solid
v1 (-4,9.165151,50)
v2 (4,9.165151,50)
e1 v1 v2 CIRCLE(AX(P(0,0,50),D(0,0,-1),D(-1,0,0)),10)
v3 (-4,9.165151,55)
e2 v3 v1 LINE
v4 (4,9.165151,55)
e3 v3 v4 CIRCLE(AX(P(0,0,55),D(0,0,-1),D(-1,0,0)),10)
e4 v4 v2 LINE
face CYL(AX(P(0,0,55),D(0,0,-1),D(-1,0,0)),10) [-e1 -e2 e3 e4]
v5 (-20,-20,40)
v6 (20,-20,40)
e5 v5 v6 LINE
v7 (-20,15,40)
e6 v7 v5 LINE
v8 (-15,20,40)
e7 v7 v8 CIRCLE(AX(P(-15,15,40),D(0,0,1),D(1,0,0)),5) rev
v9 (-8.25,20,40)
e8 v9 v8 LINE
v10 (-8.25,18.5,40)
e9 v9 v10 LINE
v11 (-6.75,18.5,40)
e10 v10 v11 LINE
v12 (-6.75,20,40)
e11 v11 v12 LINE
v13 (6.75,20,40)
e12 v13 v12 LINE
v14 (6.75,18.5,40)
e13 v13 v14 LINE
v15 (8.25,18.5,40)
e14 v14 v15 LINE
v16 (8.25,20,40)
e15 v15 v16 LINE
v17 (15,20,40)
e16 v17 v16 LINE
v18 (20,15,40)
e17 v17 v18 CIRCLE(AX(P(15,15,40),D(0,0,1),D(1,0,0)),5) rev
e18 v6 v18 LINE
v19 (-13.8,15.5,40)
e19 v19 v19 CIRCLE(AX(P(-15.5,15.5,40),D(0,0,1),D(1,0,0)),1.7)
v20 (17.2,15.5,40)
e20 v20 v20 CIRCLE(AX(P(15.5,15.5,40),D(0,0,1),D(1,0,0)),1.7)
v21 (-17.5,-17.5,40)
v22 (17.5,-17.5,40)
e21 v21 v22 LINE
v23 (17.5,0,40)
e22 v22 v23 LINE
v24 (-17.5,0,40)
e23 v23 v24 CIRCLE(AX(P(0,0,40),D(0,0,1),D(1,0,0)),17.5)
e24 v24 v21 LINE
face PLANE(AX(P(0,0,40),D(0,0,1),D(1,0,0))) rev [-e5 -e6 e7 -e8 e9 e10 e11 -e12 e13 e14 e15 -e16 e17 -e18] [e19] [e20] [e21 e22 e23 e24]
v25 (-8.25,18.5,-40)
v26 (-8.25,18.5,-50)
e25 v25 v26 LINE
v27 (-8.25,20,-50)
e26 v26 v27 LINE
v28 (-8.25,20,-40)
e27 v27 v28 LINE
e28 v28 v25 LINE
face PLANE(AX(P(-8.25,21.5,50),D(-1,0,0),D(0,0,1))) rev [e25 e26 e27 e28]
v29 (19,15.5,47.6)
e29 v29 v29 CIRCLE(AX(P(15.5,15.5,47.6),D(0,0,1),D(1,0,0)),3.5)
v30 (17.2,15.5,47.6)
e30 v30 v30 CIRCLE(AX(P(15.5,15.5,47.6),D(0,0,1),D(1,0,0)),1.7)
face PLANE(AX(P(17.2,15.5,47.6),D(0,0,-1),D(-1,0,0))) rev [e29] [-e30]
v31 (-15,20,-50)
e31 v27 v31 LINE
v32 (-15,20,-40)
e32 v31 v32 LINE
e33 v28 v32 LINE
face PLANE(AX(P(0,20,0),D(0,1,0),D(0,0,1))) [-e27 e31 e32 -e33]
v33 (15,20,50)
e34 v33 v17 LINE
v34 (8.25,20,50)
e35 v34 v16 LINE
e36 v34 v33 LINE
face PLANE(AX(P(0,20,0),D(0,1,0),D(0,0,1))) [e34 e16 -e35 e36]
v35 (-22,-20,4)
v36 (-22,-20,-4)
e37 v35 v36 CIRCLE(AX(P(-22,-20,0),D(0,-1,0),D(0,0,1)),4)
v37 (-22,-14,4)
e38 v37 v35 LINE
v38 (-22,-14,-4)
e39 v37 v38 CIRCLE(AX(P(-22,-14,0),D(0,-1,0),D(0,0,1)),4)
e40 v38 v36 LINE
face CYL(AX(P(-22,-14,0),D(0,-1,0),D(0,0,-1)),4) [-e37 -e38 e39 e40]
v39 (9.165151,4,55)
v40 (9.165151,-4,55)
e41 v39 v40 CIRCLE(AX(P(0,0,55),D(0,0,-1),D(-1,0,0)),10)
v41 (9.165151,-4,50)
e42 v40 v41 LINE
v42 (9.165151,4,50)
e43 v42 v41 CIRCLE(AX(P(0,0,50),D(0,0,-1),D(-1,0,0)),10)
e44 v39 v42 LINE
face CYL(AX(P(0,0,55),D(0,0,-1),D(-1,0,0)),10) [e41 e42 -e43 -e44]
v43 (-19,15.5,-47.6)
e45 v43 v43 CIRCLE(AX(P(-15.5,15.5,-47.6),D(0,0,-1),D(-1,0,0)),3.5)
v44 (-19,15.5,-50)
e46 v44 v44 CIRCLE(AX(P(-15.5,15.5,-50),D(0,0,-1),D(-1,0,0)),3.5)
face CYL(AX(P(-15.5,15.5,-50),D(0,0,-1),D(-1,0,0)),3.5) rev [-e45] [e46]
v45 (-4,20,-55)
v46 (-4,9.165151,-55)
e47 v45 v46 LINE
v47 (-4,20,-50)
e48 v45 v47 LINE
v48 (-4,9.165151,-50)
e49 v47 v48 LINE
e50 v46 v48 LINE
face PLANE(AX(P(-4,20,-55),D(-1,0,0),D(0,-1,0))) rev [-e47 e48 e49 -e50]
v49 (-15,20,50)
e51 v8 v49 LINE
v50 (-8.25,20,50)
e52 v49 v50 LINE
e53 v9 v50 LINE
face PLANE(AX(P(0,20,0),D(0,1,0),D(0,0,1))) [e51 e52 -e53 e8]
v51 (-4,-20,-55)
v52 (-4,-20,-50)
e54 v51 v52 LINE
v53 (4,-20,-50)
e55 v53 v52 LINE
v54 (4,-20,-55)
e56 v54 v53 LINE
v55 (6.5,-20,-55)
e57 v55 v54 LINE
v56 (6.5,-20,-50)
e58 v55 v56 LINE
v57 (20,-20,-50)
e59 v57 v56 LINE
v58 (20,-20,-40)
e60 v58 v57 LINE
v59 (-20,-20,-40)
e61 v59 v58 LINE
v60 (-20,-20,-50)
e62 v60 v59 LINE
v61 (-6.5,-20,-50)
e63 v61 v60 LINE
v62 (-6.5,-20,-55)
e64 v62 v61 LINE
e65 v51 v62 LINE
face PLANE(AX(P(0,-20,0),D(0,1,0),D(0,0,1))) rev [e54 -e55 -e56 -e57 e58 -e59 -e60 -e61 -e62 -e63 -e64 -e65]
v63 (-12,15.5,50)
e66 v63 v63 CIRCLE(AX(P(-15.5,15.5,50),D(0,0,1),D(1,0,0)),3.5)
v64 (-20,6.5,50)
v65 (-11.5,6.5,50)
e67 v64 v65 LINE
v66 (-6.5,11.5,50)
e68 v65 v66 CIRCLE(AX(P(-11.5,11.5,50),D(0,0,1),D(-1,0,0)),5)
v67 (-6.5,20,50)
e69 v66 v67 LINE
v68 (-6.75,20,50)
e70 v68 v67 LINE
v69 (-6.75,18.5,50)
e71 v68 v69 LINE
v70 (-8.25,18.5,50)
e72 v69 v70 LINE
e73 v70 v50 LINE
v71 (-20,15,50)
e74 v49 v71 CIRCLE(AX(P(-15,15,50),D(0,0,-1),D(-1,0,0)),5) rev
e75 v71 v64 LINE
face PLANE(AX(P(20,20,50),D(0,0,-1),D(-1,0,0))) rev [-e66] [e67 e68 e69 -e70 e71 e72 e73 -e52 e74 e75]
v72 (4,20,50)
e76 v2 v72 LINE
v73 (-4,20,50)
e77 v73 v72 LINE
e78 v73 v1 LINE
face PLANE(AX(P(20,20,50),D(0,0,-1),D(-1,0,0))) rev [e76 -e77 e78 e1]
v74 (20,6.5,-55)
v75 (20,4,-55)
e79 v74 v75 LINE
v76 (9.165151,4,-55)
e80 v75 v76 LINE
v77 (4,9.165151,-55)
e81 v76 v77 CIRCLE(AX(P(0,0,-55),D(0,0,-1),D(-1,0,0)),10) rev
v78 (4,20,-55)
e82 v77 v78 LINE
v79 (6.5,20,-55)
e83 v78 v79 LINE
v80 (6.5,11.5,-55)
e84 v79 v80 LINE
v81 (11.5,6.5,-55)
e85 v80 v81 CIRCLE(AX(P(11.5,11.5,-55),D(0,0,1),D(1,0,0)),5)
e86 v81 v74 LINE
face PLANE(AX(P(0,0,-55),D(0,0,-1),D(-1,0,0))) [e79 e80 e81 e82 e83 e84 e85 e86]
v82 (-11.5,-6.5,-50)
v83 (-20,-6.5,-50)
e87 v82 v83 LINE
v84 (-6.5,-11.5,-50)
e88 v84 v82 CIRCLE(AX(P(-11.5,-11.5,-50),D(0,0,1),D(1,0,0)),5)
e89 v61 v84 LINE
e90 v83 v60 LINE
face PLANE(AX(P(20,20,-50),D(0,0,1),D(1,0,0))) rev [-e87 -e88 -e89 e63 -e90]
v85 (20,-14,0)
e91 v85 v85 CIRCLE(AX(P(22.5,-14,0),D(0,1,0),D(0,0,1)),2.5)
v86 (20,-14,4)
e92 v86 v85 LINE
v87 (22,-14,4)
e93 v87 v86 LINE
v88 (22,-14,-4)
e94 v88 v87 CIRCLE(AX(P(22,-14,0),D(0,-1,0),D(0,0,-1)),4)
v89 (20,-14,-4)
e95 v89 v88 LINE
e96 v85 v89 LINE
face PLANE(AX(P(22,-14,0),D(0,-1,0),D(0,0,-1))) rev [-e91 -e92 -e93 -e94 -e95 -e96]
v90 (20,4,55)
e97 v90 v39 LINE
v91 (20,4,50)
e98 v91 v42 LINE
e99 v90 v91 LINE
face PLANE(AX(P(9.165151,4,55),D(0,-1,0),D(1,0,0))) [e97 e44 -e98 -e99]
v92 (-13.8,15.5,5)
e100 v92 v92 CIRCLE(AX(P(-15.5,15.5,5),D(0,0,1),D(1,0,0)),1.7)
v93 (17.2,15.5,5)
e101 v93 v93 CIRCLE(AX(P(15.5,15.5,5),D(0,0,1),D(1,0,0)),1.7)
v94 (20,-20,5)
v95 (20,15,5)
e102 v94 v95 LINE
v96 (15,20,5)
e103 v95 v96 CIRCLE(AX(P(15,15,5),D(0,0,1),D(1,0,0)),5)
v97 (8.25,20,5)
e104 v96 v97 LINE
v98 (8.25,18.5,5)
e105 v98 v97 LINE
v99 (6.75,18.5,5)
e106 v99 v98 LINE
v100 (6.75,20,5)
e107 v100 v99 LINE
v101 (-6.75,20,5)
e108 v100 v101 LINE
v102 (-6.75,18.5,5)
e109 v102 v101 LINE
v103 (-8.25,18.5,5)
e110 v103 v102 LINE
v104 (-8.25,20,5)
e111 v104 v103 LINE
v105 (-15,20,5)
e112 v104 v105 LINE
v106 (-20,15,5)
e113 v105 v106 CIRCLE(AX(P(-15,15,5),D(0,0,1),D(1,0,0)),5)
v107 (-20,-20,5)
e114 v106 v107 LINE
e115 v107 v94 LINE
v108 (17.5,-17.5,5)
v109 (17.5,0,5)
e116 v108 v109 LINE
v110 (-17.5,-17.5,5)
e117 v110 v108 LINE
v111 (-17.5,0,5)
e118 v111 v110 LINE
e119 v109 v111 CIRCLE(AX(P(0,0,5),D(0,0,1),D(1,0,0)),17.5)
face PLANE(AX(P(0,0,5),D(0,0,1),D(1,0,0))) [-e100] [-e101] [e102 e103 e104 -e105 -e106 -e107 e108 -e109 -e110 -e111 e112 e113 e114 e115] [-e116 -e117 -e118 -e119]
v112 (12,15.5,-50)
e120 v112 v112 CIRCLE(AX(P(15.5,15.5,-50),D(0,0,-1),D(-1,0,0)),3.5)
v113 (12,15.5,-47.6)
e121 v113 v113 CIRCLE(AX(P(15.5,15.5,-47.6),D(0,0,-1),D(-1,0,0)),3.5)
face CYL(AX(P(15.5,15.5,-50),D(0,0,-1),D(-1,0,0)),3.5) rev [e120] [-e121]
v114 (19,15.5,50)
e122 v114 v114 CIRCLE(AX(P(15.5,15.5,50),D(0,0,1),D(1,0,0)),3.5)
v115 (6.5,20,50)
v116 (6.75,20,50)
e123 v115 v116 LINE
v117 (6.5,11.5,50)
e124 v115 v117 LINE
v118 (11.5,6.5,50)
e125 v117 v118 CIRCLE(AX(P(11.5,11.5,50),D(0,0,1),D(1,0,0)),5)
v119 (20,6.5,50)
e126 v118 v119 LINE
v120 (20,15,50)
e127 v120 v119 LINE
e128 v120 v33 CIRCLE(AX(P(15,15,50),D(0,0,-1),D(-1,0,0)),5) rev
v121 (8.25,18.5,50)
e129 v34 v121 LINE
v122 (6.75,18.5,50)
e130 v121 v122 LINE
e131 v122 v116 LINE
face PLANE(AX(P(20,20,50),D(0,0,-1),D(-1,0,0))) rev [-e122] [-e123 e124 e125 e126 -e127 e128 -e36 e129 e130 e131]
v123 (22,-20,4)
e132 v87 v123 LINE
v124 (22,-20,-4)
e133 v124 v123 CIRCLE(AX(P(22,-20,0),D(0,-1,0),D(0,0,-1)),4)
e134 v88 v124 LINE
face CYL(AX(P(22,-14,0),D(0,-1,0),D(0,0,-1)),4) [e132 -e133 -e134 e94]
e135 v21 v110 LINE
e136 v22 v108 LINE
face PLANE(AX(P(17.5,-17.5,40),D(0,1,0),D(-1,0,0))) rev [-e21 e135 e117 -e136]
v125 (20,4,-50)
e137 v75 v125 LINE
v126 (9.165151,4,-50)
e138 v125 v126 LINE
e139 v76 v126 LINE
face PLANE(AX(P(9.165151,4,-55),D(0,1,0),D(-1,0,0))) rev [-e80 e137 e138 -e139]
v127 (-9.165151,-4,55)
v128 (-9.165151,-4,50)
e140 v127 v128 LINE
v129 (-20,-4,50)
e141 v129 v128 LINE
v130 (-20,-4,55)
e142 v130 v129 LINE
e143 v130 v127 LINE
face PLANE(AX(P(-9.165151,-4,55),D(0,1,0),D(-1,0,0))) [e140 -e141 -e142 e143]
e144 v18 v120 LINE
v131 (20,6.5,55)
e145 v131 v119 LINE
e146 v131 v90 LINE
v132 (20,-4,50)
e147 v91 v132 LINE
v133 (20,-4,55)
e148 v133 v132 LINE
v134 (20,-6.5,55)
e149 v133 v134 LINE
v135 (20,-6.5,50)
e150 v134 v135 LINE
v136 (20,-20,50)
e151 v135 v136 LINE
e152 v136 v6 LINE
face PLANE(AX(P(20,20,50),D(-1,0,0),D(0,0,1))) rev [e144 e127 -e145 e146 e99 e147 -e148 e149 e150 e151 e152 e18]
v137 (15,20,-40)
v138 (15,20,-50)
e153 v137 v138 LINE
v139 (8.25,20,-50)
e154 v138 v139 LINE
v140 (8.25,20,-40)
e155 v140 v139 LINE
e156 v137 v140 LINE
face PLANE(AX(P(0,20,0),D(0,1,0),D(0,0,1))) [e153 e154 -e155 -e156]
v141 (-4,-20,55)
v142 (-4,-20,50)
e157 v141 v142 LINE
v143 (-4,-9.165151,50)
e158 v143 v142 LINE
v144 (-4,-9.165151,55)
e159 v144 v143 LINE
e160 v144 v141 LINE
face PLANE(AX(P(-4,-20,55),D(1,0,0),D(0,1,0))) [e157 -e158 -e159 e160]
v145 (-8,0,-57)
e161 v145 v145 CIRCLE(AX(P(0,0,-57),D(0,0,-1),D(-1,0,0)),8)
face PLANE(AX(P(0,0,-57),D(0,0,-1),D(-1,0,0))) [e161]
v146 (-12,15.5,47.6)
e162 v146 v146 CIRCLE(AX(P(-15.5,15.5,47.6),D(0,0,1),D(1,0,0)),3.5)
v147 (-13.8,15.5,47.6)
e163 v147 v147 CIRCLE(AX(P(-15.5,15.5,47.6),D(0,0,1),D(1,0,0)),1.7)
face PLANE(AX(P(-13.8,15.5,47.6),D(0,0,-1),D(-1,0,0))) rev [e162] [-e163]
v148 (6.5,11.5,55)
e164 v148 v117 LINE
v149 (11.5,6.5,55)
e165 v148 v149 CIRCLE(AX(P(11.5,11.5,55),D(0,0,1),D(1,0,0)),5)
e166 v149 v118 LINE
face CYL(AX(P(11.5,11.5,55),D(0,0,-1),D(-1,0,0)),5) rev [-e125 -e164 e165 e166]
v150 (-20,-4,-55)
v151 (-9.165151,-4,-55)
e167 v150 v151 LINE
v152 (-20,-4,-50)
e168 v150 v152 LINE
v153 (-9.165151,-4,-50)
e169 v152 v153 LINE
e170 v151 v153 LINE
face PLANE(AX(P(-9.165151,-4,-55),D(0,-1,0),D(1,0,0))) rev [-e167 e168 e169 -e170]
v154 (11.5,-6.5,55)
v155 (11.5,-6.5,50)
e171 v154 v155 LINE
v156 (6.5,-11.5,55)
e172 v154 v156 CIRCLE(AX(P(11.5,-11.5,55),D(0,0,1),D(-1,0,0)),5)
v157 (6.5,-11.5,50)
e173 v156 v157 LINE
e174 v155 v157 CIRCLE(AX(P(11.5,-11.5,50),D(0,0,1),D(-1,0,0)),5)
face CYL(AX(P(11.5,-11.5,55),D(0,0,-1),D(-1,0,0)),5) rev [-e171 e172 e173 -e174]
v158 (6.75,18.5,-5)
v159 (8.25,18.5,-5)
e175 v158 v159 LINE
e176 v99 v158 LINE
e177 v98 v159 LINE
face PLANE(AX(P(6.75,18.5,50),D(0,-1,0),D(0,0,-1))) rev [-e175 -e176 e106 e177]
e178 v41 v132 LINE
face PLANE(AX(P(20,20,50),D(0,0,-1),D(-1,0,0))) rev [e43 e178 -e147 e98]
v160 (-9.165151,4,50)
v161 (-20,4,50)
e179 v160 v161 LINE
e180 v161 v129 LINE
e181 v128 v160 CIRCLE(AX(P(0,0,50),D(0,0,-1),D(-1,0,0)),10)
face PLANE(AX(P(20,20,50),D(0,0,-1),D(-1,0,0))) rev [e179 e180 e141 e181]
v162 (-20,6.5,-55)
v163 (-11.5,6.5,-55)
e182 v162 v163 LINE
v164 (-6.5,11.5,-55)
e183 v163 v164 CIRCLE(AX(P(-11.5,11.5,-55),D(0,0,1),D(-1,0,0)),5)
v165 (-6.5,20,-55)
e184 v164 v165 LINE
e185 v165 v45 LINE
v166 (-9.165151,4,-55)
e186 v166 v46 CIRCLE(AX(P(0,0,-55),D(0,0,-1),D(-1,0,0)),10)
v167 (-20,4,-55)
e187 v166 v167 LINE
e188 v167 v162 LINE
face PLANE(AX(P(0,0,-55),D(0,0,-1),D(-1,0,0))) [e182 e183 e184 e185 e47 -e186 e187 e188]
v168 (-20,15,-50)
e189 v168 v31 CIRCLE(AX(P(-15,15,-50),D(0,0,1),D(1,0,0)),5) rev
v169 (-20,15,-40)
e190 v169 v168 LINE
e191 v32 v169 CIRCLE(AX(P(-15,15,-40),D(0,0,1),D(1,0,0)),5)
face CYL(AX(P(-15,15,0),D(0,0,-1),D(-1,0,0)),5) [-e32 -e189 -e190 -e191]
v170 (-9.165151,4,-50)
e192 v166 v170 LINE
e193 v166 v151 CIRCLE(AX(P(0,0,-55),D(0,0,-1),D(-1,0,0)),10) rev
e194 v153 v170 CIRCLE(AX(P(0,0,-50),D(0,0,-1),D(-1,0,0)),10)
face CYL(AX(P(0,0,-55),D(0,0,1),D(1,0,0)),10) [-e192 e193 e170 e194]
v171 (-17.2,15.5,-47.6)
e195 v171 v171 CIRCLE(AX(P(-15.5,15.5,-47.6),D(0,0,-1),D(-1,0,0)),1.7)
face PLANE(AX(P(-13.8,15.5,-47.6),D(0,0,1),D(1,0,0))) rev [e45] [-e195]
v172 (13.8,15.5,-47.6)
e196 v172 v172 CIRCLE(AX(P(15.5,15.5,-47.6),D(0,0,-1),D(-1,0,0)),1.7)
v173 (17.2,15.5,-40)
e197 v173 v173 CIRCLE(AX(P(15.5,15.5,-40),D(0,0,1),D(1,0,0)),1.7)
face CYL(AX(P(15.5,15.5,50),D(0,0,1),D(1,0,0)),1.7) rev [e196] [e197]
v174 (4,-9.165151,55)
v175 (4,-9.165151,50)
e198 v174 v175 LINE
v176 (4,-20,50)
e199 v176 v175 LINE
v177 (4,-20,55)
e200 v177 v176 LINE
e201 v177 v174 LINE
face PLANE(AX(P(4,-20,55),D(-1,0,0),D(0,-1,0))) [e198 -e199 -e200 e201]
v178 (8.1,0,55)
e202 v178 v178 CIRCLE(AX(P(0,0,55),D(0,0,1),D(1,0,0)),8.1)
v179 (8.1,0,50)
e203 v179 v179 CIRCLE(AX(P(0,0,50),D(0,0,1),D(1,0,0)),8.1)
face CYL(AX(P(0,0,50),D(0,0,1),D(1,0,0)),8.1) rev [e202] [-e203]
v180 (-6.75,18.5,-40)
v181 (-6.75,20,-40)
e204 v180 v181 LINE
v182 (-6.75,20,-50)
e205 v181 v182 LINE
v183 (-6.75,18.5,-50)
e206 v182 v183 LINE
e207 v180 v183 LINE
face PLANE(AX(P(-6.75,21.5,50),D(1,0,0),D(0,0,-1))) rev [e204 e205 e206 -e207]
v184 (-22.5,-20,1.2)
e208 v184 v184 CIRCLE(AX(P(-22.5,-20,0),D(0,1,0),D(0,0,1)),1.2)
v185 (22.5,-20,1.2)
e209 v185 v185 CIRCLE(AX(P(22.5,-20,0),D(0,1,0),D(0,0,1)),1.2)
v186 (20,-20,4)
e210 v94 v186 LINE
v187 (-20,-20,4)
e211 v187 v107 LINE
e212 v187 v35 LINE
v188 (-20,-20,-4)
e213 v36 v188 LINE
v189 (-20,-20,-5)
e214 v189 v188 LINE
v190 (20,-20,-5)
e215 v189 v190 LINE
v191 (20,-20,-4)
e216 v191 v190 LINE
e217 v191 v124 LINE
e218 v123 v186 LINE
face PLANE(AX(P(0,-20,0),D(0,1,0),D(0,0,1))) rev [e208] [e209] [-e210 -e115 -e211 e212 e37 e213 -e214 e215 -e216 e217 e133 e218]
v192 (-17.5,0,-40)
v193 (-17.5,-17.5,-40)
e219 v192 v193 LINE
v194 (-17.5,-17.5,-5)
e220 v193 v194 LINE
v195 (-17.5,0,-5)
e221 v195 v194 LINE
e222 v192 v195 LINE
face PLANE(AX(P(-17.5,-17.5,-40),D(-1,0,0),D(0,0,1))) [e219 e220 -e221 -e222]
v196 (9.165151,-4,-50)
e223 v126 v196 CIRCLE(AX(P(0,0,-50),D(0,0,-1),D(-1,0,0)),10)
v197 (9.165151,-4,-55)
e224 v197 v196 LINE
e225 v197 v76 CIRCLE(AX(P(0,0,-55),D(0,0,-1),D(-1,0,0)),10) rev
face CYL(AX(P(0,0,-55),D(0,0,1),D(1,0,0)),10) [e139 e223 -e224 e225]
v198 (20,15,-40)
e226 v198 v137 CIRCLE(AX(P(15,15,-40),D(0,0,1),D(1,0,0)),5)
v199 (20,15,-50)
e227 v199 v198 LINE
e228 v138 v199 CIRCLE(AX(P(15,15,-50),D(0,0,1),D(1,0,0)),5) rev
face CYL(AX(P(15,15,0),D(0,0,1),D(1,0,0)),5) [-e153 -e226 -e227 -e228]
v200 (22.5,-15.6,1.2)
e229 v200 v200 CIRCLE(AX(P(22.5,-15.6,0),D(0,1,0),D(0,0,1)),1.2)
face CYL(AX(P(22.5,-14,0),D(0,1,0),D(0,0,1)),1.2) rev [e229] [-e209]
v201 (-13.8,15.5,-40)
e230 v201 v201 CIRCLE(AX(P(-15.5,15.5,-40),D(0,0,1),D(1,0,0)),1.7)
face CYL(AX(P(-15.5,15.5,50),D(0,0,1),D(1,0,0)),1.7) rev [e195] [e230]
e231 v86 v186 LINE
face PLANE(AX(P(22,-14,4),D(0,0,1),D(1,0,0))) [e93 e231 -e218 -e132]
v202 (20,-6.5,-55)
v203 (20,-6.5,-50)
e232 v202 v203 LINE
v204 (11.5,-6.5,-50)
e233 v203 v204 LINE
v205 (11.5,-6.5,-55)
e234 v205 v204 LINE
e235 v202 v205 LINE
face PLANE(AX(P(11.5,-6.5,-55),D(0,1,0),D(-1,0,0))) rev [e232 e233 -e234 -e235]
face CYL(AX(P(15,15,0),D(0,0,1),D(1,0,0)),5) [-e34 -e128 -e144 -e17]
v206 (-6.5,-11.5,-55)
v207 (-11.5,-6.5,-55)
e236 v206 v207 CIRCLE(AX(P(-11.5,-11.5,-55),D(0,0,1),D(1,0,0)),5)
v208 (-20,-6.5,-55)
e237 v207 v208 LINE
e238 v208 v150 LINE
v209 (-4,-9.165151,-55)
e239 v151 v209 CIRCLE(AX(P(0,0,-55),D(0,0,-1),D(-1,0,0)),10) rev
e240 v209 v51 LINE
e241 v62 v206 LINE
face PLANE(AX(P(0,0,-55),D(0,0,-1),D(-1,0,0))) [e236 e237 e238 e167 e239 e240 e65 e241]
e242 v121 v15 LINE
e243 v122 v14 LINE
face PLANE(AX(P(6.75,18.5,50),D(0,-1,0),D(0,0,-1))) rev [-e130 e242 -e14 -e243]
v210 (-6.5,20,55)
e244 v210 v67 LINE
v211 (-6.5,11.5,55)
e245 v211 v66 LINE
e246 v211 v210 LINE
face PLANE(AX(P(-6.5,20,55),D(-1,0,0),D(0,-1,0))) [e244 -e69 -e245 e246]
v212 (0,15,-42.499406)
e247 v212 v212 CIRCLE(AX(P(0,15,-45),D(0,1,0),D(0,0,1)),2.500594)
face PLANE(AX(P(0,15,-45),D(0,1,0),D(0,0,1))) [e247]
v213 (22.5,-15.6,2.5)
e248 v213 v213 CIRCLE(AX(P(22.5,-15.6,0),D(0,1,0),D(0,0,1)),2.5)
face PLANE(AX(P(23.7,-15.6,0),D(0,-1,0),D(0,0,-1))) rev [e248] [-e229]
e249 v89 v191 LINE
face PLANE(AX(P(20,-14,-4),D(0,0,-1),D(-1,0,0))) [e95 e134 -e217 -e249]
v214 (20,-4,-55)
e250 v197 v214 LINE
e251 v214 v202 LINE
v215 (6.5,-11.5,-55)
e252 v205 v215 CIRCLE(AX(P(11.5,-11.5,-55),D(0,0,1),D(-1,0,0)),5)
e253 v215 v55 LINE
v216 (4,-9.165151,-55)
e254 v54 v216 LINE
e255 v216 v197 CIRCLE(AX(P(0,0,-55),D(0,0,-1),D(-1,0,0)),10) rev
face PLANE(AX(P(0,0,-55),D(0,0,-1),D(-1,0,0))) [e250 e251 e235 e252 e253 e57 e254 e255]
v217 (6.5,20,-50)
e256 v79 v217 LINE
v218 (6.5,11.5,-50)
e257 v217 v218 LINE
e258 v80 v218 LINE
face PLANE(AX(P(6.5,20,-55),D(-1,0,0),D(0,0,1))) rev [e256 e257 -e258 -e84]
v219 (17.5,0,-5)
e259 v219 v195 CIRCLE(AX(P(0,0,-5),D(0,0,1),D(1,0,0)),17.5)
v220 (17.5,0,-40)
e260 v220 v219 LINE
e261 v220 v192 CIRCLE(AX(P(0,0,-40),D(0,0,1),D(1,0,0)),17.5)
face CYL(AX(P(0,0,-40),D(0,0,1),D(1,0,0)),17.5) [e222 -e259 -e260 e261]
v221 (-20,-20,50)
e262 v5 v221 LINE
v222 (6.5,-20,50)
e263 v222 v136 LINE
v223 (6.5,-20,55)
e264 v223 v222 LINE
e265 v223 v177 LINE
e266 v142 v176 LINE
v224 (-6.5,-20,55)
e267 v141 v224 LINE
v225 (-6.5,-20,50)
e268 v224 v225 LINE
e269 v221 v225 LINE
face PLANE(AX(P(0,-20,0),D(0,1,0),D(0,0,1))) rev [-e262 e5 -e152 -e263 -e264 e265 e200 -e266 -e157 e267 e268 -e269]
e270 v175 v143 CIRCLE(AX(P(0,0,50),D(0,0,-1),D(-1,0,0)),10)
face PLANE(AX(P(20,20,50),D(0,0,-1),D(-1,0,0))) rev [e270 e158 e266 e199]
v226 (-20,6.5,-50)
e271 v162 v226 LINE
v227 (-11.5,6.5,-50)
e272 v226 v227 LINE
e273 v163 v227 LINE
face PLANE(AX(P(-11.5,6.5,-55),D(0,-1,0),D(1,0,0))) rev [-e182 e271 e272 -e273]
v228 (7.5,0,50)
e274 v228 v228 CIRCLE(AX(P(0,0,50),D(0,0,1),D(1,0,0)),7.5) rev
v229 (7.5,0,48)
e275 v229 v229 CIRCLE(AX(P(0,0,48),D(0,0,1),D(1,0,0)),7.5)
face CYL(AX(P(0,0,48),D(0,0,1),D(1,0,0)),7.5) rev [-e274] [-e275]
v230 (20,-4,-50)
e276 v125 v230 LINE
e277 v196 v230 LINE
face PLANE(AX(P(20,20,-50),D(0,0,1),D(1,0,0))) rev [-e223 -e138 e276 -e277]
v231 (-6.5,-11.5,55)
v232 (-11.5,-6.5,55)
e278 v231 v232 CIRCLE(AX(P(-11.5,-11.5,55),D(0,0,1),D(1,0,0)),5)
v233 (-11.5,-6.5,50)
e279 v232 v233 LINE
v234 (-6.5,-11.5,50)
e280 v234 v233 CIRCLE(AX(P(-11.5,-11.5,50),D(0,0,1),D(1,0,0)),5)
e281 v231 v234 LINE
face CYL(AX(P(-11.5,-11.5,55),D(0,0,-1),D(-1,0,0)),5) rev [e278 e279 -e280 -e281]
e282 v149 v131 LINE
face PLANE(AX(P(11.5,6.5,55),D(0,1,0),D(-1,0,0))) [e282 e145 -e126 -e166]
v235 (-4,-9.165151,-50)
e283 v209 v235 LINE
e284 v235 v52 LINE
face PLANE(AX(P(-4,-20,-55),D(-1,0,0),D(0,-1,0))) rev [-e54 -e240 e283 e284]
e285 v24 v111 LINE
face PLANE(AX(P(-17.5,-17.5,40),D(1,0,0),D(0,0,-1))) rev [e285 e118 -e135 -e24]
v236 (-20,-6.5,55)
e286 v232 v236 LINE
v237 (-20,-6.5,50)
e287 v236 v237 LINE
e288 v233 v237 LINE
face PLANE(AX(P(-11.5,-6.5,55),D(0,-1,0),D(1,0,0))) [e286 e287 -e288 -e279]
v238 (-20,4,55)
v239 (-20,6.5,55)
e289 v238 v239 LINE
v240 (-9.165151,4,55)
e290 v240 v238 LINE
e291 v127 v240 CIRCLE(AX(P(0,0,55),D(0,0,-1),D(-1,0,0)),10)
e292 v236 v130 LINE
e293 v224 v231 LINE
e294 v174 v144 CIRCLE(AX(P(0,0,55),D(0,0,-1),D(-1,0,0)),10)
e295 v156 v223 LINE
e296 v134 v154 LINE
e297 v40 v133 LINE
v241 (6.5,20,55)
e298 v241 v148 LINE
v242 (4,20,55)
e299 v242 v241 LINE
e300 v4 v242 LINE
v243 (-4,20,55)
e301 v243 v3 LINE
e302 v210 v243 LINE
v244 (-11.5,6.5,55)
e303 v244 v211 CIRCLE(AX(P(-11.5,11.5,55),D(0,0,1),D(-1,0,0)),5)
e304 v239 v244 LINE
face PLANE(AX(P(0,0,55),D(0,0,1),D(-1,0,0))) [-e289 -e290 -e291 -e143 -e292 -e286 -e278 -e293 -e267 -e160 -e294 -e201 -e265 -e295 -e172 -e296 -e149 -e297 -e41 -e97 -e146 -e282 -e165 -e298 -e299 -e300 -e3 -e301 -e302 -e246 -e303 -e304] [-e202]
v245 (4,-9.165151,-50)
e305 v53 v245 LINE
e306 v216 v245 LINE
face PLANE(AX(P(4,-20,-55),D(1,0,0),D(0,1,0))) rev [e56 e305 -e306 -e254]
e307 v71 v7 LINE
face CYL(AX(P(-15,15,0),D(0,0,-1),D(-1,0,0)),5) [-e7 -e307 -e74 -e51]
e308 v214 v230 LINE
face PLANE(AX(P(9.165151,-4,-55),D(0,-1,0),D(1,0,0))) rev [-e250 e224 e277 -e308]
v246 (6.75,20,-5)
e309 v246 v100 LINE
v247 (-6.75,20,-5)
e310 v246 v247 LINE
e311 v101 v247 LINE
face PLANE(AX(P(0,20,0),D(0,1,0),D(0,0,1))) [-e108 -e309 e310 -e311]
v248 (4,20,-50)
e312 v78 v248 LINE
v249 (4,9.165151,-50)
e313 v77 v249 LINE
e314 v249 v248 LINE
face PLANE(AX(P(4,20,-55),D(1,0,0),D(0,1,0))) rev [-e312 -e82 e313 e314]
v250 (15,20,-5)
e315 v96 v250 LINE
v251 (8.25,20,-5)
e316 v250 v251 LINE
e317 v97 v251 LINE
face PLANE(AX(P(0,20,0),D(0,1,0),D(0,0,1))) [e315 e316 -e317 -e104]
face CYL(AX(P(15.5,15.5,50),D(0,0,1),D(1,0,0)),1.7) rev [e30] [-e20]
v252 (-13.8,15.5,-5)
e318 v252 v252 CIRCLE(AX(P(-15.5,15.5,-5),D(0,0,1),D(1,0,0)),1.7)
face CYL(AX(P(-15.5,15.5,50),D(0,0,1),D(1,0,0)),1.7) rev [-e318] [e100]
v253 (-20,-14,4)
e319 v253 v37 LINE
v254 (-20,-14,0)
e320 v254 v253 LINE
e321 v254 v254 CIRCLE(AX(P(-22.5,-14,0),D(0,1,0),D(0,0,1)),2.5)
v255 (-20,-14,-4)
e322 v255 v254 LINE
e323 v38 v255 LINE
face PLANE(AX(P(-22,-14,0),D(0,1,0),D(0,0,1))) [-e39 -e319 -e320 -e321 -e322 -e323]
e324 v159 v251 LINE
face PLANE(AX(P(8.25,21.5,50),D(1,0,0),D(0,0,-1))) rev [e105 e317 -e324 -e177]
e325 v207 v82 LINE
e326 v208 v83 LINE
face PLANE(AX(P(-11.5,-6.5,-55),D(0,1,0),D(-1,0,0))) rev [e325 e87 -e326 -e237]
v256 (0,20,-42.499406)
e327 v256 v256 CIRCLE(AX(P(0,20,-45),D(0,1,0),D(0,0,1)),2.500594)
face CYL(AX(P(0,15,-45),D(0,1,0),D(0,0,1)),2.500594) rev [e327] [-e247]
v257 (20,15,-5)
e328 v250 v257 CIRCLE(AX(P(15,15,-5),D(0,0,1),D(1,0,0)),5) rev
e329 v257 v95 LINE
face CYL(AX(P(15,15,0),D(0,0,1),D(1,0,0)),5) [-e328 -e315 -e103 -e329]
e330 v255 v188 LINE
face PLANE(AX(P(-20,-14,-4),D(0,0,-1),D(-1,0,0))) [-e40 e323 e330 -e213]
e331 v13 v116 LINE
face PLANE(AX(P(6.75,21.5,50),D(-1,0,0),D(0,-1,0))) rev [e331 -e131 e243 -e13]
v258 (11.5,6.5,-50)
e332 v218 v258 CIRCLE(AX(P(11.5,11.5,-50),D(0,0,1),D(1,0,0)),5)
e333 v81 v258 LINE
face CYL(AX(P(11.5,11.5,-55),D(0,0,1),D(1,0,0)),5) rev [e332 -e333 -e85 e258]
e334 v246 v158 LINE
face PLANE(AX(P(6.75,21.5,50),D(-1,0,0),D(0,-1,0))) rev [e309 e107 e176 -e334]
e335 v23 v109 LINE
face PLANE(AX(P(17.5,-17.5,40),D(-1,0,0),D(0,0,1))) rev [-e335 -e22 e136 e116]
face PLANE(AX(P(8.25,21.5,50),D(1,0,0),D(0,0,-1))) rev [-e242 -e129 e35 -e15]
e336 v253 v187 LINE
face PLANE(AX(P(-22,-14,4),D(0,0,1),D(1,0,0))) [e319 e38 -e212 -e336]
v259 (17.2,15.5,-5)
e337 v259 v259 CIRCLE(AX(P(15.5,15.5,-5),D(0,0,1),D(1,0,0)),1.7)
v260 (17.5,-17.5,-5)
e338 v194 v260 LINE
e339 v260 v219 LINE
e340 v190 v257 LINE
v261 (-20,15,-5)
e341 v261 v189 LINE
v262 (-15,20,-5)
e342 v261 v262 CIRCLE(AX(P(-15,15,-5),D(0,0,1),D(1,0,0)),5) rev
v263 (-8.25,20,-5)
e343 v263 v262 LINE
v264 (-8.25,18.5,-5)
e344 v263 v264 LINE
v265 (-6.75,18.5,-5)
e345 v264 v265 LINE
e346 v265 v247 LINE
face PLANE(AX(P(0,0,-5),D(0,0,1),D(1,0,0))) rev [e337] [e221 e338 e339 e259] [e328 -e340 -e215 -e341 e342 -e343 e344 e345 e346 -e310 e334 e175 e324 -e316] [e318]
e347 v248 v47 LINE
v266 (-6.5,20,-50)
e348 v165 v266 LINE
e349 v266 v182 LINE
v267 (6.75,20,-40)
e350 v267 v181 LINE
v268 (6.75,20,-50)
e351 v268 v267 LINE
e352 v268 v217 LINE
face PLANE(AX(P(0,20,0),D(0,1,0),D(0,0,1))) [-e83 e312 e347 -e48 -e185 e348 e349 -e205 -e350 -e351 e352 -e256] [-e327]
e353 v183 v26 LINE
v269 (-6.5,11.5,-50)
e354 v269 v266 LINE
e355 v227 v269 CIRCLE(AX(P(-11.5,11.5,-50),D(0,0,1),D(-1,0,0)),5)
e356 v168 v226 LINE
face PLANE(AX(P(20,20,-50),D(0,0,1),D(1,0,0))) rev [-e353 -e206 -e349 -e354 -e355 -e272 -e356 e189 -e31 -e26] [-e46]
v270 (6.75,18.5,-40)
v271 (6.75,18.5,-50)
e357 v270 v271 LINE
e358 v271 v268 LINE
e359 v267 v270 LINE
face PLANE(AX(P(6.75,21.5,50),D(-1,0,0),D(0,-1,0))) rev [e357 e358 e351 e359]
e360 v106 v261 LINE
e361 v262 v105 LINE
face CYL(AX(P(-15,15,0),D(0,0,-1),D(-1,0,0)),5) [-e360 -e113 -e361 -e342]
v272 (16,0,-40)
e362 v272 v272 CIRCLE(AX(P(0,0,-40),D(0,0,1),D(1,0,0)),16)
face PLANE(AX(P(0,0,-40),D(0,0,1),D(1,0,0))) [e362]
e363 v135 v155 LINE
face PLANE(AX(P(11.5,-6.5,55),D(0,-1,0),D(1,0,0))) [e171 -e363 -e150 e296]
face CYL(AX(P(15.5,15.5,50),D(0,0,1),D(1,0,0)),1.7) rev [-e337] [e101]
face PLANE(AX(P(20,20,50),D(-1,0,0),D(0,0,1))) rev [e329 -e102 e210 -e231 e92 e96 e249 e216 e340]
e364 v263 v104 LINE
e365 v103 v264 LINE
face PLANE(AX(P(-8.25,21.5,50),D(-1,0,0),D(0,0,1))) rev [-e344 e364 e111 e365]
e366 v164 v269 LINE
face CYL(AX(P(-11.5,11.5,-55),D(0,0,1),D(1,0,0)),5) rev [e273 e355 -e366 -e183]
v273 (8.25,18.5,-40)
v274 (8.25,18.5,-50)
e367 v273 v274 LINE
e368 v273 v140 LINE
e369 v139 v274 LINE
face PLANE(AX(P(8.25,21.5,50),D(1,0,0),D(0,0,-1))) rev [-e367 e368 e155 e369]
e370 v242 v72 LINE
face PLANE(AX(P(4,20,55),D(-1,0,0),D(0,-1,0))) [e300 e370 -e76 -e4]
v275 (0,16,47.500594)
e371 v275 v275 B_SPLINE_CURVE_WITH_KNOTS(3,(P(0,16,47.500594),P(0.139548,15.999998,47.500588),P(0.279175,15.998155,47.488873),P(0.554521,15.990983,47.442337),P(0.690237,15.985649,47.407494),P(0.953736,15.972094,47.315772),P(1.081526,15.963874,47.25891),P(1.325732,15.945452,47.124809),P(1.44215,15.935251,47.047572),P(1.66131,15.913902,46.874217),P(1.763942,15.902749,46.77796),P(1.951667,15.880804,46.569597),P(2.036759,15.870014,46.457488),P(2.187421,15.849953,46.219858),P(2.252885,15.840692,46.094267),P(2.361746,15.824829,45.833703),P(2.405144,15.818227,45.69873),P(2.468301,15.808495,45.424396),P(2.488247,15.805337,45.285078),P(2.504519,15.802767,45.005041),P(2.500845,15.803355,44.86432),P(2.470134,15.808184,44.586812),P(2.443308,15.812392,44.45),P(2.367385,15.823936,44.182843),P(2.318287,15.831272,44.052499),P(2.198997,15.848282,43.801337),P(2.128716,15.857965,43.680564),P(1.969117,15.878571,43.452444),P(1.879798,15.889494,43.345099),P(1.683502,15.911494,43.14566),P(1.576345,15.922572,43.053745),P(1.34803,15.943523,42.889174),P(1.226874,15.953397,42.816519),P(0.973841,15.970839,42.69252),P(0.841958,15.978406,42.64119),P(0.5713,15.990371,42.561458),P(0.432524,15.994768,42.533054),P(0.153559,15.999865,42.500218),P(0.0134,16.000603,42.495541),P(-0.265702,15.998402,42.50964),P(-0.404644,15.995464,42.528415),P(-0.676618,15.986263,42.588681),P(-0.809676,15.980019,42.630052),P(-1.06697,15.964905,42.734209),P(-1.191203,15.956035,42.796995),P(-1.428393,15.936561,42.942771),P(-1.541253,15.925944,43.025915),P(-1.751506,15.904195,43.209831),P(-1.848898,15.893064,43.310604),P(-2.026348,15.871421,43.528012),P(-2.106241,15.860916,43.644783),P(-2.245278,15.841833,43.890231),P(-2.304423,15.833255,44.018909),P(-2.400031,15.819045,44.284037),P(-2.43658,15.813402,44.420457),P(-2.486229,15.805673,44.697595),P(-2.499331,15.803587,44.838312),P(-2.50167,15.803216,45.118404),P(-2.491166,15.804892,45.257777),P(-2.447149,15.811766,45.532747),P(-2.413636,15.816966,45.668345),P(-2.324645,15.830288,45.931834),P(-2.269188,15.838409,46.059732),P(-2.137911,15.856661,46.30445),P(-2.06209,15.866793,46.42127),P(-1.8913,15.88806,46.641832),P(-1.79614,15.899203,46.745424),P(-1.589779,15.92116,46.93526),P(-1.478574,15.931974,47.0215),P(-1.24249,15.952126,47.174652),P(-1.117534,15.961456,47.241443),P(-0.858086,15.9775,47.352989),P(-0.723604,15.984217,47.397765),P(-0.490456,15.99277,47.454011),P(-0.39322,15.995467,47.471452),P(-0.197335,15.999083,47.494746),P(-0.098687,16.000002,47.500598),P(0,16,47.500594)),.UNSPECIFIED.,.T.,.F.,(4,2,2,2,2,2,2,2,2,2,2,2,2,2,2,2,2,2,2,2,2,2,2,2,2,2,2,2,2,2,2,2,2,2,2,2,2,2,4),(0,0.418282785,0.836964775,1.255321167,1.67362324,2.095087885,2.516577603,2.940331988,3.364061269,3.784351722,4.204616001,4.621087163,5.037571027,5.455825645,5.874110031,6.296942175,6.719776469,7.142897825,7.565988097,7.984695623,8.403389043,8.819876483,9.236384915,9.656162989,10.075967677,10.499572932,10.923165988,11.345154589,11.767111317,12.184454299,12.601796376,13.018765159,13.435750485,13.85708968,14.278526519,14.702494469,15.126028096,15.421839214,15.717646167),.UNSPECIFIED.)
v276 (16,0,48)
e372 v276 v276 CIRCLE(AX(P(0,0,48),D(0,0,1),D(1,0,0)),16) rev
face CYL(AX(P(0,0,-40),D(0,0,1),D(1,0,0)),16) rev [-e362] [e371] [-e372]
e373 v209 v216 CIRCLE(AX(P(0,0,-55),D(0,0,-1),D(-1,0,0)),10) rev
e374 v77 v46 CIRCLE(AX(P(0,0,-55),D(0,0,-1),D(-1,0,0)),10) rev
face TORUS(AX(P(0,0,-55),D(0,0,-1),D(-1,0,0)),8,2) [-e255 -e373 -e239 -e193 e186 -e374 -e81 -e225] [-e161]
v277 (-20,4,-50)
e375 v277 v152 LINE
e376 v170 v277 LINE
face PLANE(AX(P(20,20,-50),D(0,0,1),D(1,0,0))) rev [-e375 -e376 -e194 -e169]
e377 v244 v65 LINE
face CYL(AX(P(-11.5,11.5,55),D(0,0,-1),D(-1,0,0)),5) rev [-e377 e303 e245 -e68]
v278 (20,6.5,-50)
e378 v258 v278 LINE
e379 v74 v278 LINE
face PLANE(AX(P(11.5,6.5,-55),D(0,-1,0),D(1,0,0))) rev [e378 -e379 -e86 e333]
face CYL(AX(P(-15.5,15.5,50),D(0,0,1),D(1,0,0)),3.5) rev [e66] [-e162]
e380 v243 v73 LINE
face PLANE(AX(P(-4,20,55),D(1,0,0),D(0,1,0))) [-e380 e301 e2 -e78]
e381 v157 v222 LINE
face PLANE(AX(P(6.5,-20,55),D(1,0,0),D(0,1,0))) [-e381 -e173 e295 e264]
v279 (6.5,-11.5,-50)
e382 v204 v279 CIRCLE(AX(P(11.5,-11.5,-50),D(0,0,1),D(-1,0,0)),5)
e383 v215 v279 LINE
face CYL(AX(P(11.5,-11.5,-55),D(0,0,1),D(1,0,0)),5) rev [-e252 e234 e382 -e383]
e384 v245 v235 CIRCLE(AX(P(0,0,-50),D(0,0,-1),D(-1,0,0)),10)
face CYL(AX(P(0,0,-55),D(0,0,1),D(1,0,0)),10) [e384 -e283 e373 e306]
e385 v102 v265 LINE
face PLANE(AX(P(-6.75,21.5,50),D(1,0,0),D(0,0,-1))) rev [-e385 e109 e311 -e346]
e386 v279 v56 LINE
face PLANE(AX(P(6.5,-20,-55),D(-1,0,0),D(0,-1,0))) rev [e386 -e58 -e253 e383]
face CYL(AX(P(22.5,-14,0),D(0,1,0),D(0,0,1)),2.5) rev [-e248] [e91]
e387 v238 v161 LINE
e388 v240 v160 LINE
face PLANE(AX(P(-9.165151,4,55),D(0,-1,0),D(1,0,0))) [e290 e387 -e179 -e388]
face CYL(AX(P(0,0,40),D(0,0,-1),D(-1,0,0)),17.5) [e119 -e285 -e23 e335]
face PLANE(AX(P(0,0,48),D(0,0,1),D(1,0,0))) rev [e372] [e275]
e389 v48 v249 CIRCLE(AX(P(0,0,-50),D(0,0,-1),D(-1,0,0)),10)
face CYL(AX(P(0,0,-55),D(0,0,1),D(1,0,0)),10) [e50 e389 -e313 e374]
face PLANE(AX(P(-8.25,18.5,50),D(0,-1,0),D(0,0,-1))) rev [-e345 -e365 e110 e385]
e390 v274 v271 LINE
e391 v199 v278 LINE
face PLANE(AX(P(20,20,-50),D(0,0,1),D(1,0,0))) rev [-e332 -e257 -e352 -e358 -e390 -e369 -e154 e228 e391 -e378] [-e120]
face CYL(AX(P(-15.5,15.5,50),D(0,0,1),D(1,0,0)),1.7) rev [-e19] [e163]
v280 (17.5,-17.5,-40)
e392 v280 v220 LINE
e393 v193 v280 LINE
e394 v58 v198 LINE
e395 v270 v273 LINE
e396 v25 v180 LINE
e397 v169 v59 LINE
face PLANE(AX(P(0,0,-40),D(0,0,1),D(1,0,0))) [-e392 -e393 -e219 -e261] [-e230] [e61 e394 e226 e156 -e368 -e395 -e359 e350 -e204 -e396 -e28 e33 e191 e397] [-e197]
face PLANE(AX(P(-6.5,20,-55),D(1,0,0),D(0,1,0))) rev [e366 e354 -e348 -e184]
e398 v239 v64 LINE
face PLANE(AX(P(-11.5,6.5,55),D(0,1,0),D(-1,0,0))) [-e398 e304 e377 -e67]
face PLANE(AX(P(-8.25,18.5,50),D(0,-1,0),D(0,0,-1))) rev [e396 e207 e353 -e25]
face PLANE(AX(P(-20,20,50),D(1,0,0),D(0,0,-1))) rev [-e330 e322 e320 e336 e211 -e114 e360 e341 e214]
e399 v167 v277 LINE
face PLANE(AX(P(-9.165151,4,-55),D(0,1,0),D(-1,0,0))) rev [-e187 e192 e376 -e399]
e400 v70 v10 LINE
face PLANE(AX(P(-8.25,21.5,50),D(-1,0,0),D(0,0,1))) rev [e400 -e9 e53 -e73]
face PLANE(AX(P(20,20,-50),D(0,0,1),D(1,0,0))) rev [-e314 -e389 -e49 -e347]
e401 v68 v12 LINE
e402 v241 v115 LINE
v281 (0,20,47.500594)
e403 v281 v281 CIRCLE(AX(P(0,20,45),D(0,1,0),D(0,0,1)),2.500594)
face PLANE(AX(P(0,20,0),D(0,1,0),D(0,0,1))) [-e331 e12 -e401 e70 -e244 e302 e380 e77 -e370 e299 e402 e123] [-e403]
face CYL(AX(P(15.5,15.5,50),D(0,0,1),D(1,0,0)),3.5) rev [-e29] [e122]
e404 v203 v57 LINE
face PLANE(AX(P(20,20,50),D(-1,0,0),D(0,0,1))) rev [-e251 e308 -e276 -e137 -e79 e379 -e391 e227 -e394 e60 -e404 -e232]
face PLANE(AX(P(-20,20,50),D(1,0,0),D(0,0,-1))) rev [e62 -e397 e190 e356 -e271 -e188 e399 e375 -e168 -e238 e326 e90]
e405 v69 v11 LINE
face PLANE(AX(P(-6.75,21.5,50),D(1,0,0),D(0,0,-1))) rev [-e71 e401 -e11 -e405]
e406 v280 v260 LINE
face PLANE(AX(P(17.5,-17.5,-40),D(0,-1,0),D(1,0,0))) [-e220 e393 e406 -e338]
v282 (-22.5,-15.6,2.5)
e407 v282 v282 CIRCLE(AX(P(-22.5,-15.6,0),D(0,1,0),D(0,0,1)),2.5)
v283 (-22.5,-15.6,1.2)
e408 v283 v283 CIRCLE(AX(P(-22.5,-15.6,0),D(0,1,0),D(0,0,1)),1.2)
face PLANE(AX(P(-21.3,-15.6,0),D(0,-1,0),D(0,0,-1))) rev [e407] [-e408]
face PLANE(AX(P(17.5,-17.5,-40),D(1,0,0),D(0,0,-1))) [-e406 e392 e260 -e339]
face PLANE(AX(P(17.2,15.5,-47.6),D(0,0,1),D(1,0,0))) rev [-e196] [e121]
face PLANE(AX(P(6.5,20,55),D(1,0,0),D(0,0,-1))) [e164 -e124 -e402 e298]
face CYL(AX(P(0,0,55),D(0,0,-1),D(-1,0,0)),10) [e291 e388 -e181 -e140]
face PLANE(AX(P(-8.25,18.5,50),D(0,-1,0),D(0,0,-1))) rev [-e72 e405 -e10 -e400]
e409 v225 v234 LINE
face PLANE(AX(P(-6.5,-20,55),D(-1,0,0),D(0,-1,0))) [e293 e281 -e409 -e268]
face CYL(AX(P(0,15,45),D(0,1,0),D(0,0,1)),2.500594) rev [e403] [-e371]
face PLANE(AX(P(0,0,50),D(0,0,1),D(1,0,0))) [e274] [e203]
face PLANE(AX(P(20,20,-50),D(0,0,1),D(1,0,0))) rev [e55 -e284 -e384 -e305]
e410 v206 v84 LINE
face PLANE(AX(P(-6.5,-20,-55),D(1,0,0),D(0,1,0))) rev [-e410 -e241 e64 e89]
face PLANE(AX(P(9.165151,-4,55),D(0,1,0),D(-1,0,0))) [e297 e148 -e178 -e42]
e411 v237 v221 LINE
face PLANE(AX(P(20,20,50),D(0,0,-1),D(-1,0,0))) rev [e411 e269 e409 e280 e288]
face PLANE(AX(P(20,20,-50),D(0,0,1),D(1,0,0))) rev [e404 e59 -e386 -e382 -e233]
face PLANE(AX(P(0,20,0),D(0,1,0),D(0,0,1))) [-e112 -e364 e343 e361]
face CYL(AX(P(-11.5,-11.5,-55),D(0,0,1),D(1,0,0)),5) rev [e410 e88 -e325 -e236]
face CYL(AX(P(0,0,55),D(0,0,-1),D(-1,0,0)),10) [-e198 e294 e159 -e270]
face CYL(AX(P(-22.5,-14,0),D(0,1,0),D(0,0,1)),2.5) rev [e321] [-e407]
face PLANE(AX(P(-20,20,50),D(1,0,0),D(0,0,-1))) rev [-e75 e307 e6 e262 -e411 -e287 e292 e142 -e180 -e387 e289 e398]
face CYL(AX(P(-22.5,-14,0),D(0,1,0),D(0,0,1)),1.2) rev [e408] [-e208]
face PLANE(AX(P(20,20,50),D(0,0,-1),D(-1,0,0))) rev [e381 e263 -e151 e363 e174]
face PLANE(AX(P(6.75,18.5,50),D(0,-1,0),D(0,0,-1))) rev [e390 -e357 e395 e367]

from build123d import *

# Parameters (mm, degrees)
ESBO_O1_W                                            = 40
ESBO_O1_H                                            = 100
RESSALTO_EXTRUS_O1_DEPTH                             = 20
CORTE_EXTRUS_O1_DEPTH                                = 58.445626465
CORTE_EXTRUS_O1_DEPTH_BACK                           = 40
ESBO_O2_R                                            = 16
CORTE_EXTRUS_O5_START                                = -5
ESBO_O9_W                                            = 40
ESBO_O9_H                                            = 40
CORTE_EXTRUS_O5_DEPTH                                = 35
CORTE_EXTRUS_O7_START                                = 40
ESBO_O9_4_W                                          = 40
ESBO_O9_4_H                                          = 40
CORTE_EXTRUS_O7_DEPTH                                = 35
RESSALTO_EXTRUS_O2_DEPTH                             = 6
REBAIXO_PARA_PARAFUSO_DE_M_QUINA_COM_CAB_D           = 2.4
REBAIXO_PARA_PARAFUSO_DE_M_QUINA_COM_CAB_CBORE_D     = 5
REBAIXO_PARA_PARAFUSO_DE_M_QUINA_COM_CAB_CBORE_DEPTH = 1.6
REBAIXO_PARA_PARAFUSO_DE_M_QUINA_COM_2_D             = 3.4
REBAIXO_PARA_PARAFUSO_DE_M_QUINA_COM_2_CBORE_D       = 7
REBAIXO_PARA_PARAFUSO_DE_M_QUINA_COM_2_CBORE_DEPTH   = 2.4
FILETE4_R                                            = 5
REBAIXO_PARA_PARAFUSO_DE_M_QUINA_COM_3_D             = 3.4
REBAIXO_PARA_PARAFUSO_DE_M_QUINA_COM_3_DEPTH         = 10.05
REBAIXO_PARA_PARAFUSO_DE_M_QUINA_COM_3_CBORE_D       = 7
REBAIXO_PARA_PARAFUSO_DE_M_QUINA_COM_3_CBORE_DEPTH   = 2.4
REBAIXO_PARA_PARAFUSO_DE_M_QUINA_COM_3_TIP           = 1.021463052
ESBO_O20_W                                           = 1.5
ESBO_O20_H                                           = 3
CORTE_EXTRUS_O8_DEPTH                                = 106.242576935
ESBO_O21_R                                           = 2.50059394
CORTE_EXTRUS_O9_DEPTH                                = 5
RESSALTO_EXTRUS_O3_DEPTH                             = 5
ESBO_O23_R                                           = 10
RESSALTO_EXTRUS_O4_DEPTH                             = 2
FILETE5_R                                            = 2
RESSALTO_EXTRUS_O5_START                             = -2
ESBO_O24_R                                           = 16
ESBO_O24_R_2                                         = 7.5
RESSALTO_EXTRUS_O5_DEPTH                             = 2
ESBO_O26_R                                           = 8.1
CORTE_EXTRUS_O10_DEPTH                               = 5


with BuildPart() as part:
    # Esboço1 → Ressalto-extrusão1 (new, symmetric)
    with BuildSketch(Plane(origin=(0, 0, 0), x_dir=(1, 0, 0), z_dir=(0, 1, 0))):
        Rectangle(ESBO_O1_W, ESBO_O1_H)
    extrude(amount=RESSALTO_EXTRUS_O1_DEPTH, both=True)

    # Esboço2 → Corte-extrusão1 (cut, two sides: drawn at the far end of the back side and taken through both)
    with BuildSketch(Plane.XY.offset(-CORTE_EXTRUS_O1_DEPTH_BACK)):
        Circle(ESBO_O2_R)
    extrude(amount=CORTE_EXTRUS_O1_DEPTH + CORTE_EXTRUS_O1_DEPTH_BACK, mode=Mode.SUBTRACT)

    # Esboço9 → Corte-extrusão5 (cut)
    with BuildSketch(Plane.XY.offset(CORTE_EXTRUS_O5_START)):
        Rectangle(ESBO_O9_W, ESBO_O9_H)
        with BuildLine():
            Line((17.5, -17.5), (-17.5, -17.5))
            Line((-17.5, -17.5), (-17.5, 0))
            ThreePointArc((-17.5, 0), (0, 17.5), (17.5, 0))
            Line((17.5, 0), (17.5, -17.5))
        make_face(mode=Mode.SUBTRACT)
    extrude(amount=-CORTE_EXTRUS_O5_DEPTH, mode=Mode.SUBTRACT)

    # Esboço9<4> → Corte-extrusão7 (cut)
    with BuildSketch(Plane.XY.offset(CORTE_EXTRUS_O7_START)):
        Rectangle(ESBO_O9_4_W, ESBO_O9_4_H)
        with BuildLine():
            Line((17.5, -17.5), (-17.5, -17.5))
            Line((-17.5, -17.5), (-17.5, 0))
            ThreePointArc((-17.5, 0), (0, 17.5), (17.5, 0))
            Line((17.5, 0), (17.5, -17.5))
        make_face(mode=Mode.SUBTRACT)
    extrude(amount=-CORTE_EXTRUS_O7_DEPTH, mode=Mode.SUBTRACT)

    # Esboço3 → Ressalto-extrusão2 (add)
    with BuildSketch(Plane.XZ.offset(20)):
        with BuildLine():
            Line((20, 4), (20, -4))
            Line((20, -4), (22, -4))
            ThreePointArc((22, -4), (26, 0), (22, 4))
            Line((22, 4), (20, 4))
        make_face()
        with BuildLine():
            Line((-20, -4), (-22, -4))
            ThreePointArc((-22, -4), (-26, 0), (-22, 4))
            Line((-22, 4), (-20, 4))
            Line((-20, 4), (-20, -4))
        make_face()
    extrude(amount=-RESSALTO_EXTRUS_O2_DEPTH)

    # Rebaixo para parafuso de m_quina com cab (through all)
    with Locations(Plane(origin=(0, -14, 0), x_dir=(1, 0, 0), z_dir=(0, 1, 0))):
        with Locations((22.5, 0), (-22.5, 0)):
            CounterBoreHole(REBAIXO_PARA_PARAFUSO_DE_M_QUINA_COM_CAB_D / 2, REBAIXO_PARA_PARAFUSO_DE_M_QUINA_COM_CAB_CBORE_D / 2, REBAIXO_PARA_PARAFUSO_DE_M_QUINA_COM_CAB_CBORE_DEPTH)

    # Rebaixo para parafuso de m_quina com 2 (through all)
    with Locations(Plane.XY.offset(50)):
        with Locations((-15.5, 15.5), (15.5, 15.5)):
            CounterBoreHole(REBAIXO_PARA_PARAFUSO_DE_M_QUINA_COM_2_D / 2, REBAIXO_PARA_PARAFUSO_DE_M_QUINA_COM_2_CBORE_D / 2, REBAIXO_PARA_PARAFUSO_DE_M_QUINA_COM_2_CBORE_DEPTH)

    # Filete4
    filete4_edges = [part.edges().sort_by_distance(p)[0] for p in [
        (20, 20, 45),
        (-20, 20, 0),
        (20, 20, -45),
        (-20, 20, 45),
        (20, 20, 0),
        (-20, 20, -45),
    ]]
    fillet(filete4_edges, radius=FILETE4_R)

    # Rebaixo para parafuso de m_quina com 3
    with Locations(Plane(origin=(0, 0, -50), x_dir=(-1, 0, 0), z_dir=(0, 0, -1))):
        with Locations((-15.5, 15.5), (15.5, 15.5)):
            CounterBoreHole(REBAIXO_PARA_PARAFUSO_DE_M_QUINA_COM_3_D / 2, REBAIXO_PARA_PARAFUSO_DE_M_QUINA_COM_3_CBORE_D / 2, REBAIXO_PARA_PARAFUSO_DE_M_QUINA_COM_3_CBORE_DEPTH, depth=REBAIXO_PARA_PARAFUSO_DE_M_QUINA_COM_3_DEPTH)
            with Locations((0, 0, -(REBAIXO_PARA_PARAFUSO_DE_M_QUINA_COM_3_DEPTH + REBAIXO_PARA_PARAFUSO_DE_M_QUINA_COM_3_TIP / 2))):  # 118° drill point
                Cone(0, REBAIXO_PARA_PARAFUSO_DE_M_QUINA_COM_3_D / 2, REBAIXO_PARA_PARAFUSO_DE_M_QUINA_COM_3_TIP, mode=Mode.SUBTRACT)

    # Esboço20 → Corte-extrusão8 (cut, through all)
    with BuildSketch(Plane(origin=(0, 0, -50), x_dir=(-1, 0, 0), z_dir=(0, 0, -1))):
        with Locations((7.5, 20)):
            Rectangle(ESBO_O20_W, ESBO_O20_H)
        with Locations((-7.5, 20)):
            Rectangle(ESBO_O20_W, ESBO_O20_H)
    extrude(amount=-CORTE_EXTRUS_O8_DEPTH, mode=Mode.SUBTRACT)

    # Esboço21 → Corte-extrusão9 (cut)
    with BuildSketch(Plane(origin=(0, 20, 0), x_dir=(1, 0, 0), z_dir=(0, 1, 0))):
        with Locations(Location((0, -45, 0), (0, 0, 270))):
            Circle(ESBO_O21_R)
        with Locations(Location((0, 45, 0), (0, 0, 270))):
            Circle(ESBO_O21_R)
    extrude(amount=-CORTE_EXTRUS_O9_DEPTH, mode=Mode.SUBTRACT)

    # Esboço22 → Ressalto-extrusão3 (add)
    with BuildSketch(Plane(origin=(0, 0, -50), x_dir=(-1, 0, 0), z_dir=(0, 0, -1))):
        with BuildLine():
            Line((-6.5, 20), (-6.5, 11.5))
            ThreePointArc((-6.5, 11.5), (-7.964466094, 7.964466094), (-11.5, 6.5))
            Line((-11.5, 6.5), (-20, 6.5))
            Line((-20, 6.5), (-20, 4))
            Line((-20, 4), (-9.16515139, 4))
            ThreePointArc((-9.16515139, 4), (-10, 0), (-9.16515139, -4))
            Line((-9.16515139, -4), (-20, -4))
            Line((-20, -4), (-20, -6.5))
            Line((-20, -6.5), (-11.5, -6.5))
            ThreePointArc((-11.5, -6.5), (-7.964466094, -7.964466094), (-6.5, -11.5))
            Line((-6.5, -11.5), (-6.5, -20))
            Line((-6.5, -20), (-4, -20))
            Line((-4, -20), (-4, -9.16515139))
            ThreePointArc((-4, -9.16515139), (0, -10), (4, -9.16515139))
            Line((4, -9.16515139), (4, -20))
            Line((4, -20), (6.5, -20))
            Line((6.5, -20), (6.5, -11.5))
            ThreePointArc((6.5, -11.5), (7.964466094, -7.964466094), (11.5, -6.5))
            Line((11.5, -6.5), (20, -6.5))
            Line((20, -6.5), (20, -4))
            Line((20, -4), (9.16515139, -4))
            ThreePointArc((9.16515139, -4), (10, 0), (9.16515139, 4))
            Line((9.16515139, 4), (20, 4))
            Line((20, 4), (20, 6.5))
            Line((20, 6.5), (11.5, 6.5))
            ThreePointArc((11.5, 6.5), (7.964466094, 7.964466094), (6.5, 11.5))
            Line((6.5, 11.5), (6.5, 20))
            Line((6.5, 20), (4, 20))
            Line((4, 20), (4, 9.16515139))
            ThreePointArc((4, 9.16515139), (0, 10), (-4, 9.16515139))
            Line((-4, 9.16515139), (-4, 20))
            Line((-4, 20), (-6.5, 20))
        make_face()
    ressalto_extrus_o3 = extrude(amount=RESSALTO_EXTRUS_O3_DEPTH)

    # Esboço23 → Ressalto-extrusão4 (add)
    with BuildSketch(Plane(origin=(0, 0, -55), x_dir=(-1, 0, 0), z_dir=(0, 0, -1))):
        with Locations(Location((0, 0, 0), (0, 0, 156.421821522))):
            Circle(ESBO_O23_R)
    extrude(amount=RESSALTO_EXTRUS_O4_DEPTH)

    # Filete5
    filete5_edges = [part.edges().sort_by_distance(p)[0] for p in [
        (-9.16515139, -4, -57),
    ]]
    fillet(filete5_edges, radius=FILETE5_R - 0.0001)  # a hair under: the kernel refuses the full size

    # Esboço24 → Ressalto-extrusão5 (add)
    with BuildSketch(Plane.XY.offset(50).offset(RESSALTO_EXTRUS_O5_START)):
        Circle(ESBO_O24_R)
        Circle(ESBO_O24_R_2, mode=Mode.SUBTRACT)
    extrude(amount=RESSALTO_EXTRUS_O5_DEPTH)

    # Espelhar1: Ressalto-extrusão3 across plane
    add(ressalto_extrus_o3.mirror(Plane.XY))

    # Esboço26 → Corte-extrusão10 (cut)
    with BuildSketch(Plane.XY.offset(55)):
        Circle(ESBO_O26_R)
    extrude(amount=-CORTE_EXTRUS_O10_DEPTH, mode=Mode.SUBTRACT)


solid = part.part
